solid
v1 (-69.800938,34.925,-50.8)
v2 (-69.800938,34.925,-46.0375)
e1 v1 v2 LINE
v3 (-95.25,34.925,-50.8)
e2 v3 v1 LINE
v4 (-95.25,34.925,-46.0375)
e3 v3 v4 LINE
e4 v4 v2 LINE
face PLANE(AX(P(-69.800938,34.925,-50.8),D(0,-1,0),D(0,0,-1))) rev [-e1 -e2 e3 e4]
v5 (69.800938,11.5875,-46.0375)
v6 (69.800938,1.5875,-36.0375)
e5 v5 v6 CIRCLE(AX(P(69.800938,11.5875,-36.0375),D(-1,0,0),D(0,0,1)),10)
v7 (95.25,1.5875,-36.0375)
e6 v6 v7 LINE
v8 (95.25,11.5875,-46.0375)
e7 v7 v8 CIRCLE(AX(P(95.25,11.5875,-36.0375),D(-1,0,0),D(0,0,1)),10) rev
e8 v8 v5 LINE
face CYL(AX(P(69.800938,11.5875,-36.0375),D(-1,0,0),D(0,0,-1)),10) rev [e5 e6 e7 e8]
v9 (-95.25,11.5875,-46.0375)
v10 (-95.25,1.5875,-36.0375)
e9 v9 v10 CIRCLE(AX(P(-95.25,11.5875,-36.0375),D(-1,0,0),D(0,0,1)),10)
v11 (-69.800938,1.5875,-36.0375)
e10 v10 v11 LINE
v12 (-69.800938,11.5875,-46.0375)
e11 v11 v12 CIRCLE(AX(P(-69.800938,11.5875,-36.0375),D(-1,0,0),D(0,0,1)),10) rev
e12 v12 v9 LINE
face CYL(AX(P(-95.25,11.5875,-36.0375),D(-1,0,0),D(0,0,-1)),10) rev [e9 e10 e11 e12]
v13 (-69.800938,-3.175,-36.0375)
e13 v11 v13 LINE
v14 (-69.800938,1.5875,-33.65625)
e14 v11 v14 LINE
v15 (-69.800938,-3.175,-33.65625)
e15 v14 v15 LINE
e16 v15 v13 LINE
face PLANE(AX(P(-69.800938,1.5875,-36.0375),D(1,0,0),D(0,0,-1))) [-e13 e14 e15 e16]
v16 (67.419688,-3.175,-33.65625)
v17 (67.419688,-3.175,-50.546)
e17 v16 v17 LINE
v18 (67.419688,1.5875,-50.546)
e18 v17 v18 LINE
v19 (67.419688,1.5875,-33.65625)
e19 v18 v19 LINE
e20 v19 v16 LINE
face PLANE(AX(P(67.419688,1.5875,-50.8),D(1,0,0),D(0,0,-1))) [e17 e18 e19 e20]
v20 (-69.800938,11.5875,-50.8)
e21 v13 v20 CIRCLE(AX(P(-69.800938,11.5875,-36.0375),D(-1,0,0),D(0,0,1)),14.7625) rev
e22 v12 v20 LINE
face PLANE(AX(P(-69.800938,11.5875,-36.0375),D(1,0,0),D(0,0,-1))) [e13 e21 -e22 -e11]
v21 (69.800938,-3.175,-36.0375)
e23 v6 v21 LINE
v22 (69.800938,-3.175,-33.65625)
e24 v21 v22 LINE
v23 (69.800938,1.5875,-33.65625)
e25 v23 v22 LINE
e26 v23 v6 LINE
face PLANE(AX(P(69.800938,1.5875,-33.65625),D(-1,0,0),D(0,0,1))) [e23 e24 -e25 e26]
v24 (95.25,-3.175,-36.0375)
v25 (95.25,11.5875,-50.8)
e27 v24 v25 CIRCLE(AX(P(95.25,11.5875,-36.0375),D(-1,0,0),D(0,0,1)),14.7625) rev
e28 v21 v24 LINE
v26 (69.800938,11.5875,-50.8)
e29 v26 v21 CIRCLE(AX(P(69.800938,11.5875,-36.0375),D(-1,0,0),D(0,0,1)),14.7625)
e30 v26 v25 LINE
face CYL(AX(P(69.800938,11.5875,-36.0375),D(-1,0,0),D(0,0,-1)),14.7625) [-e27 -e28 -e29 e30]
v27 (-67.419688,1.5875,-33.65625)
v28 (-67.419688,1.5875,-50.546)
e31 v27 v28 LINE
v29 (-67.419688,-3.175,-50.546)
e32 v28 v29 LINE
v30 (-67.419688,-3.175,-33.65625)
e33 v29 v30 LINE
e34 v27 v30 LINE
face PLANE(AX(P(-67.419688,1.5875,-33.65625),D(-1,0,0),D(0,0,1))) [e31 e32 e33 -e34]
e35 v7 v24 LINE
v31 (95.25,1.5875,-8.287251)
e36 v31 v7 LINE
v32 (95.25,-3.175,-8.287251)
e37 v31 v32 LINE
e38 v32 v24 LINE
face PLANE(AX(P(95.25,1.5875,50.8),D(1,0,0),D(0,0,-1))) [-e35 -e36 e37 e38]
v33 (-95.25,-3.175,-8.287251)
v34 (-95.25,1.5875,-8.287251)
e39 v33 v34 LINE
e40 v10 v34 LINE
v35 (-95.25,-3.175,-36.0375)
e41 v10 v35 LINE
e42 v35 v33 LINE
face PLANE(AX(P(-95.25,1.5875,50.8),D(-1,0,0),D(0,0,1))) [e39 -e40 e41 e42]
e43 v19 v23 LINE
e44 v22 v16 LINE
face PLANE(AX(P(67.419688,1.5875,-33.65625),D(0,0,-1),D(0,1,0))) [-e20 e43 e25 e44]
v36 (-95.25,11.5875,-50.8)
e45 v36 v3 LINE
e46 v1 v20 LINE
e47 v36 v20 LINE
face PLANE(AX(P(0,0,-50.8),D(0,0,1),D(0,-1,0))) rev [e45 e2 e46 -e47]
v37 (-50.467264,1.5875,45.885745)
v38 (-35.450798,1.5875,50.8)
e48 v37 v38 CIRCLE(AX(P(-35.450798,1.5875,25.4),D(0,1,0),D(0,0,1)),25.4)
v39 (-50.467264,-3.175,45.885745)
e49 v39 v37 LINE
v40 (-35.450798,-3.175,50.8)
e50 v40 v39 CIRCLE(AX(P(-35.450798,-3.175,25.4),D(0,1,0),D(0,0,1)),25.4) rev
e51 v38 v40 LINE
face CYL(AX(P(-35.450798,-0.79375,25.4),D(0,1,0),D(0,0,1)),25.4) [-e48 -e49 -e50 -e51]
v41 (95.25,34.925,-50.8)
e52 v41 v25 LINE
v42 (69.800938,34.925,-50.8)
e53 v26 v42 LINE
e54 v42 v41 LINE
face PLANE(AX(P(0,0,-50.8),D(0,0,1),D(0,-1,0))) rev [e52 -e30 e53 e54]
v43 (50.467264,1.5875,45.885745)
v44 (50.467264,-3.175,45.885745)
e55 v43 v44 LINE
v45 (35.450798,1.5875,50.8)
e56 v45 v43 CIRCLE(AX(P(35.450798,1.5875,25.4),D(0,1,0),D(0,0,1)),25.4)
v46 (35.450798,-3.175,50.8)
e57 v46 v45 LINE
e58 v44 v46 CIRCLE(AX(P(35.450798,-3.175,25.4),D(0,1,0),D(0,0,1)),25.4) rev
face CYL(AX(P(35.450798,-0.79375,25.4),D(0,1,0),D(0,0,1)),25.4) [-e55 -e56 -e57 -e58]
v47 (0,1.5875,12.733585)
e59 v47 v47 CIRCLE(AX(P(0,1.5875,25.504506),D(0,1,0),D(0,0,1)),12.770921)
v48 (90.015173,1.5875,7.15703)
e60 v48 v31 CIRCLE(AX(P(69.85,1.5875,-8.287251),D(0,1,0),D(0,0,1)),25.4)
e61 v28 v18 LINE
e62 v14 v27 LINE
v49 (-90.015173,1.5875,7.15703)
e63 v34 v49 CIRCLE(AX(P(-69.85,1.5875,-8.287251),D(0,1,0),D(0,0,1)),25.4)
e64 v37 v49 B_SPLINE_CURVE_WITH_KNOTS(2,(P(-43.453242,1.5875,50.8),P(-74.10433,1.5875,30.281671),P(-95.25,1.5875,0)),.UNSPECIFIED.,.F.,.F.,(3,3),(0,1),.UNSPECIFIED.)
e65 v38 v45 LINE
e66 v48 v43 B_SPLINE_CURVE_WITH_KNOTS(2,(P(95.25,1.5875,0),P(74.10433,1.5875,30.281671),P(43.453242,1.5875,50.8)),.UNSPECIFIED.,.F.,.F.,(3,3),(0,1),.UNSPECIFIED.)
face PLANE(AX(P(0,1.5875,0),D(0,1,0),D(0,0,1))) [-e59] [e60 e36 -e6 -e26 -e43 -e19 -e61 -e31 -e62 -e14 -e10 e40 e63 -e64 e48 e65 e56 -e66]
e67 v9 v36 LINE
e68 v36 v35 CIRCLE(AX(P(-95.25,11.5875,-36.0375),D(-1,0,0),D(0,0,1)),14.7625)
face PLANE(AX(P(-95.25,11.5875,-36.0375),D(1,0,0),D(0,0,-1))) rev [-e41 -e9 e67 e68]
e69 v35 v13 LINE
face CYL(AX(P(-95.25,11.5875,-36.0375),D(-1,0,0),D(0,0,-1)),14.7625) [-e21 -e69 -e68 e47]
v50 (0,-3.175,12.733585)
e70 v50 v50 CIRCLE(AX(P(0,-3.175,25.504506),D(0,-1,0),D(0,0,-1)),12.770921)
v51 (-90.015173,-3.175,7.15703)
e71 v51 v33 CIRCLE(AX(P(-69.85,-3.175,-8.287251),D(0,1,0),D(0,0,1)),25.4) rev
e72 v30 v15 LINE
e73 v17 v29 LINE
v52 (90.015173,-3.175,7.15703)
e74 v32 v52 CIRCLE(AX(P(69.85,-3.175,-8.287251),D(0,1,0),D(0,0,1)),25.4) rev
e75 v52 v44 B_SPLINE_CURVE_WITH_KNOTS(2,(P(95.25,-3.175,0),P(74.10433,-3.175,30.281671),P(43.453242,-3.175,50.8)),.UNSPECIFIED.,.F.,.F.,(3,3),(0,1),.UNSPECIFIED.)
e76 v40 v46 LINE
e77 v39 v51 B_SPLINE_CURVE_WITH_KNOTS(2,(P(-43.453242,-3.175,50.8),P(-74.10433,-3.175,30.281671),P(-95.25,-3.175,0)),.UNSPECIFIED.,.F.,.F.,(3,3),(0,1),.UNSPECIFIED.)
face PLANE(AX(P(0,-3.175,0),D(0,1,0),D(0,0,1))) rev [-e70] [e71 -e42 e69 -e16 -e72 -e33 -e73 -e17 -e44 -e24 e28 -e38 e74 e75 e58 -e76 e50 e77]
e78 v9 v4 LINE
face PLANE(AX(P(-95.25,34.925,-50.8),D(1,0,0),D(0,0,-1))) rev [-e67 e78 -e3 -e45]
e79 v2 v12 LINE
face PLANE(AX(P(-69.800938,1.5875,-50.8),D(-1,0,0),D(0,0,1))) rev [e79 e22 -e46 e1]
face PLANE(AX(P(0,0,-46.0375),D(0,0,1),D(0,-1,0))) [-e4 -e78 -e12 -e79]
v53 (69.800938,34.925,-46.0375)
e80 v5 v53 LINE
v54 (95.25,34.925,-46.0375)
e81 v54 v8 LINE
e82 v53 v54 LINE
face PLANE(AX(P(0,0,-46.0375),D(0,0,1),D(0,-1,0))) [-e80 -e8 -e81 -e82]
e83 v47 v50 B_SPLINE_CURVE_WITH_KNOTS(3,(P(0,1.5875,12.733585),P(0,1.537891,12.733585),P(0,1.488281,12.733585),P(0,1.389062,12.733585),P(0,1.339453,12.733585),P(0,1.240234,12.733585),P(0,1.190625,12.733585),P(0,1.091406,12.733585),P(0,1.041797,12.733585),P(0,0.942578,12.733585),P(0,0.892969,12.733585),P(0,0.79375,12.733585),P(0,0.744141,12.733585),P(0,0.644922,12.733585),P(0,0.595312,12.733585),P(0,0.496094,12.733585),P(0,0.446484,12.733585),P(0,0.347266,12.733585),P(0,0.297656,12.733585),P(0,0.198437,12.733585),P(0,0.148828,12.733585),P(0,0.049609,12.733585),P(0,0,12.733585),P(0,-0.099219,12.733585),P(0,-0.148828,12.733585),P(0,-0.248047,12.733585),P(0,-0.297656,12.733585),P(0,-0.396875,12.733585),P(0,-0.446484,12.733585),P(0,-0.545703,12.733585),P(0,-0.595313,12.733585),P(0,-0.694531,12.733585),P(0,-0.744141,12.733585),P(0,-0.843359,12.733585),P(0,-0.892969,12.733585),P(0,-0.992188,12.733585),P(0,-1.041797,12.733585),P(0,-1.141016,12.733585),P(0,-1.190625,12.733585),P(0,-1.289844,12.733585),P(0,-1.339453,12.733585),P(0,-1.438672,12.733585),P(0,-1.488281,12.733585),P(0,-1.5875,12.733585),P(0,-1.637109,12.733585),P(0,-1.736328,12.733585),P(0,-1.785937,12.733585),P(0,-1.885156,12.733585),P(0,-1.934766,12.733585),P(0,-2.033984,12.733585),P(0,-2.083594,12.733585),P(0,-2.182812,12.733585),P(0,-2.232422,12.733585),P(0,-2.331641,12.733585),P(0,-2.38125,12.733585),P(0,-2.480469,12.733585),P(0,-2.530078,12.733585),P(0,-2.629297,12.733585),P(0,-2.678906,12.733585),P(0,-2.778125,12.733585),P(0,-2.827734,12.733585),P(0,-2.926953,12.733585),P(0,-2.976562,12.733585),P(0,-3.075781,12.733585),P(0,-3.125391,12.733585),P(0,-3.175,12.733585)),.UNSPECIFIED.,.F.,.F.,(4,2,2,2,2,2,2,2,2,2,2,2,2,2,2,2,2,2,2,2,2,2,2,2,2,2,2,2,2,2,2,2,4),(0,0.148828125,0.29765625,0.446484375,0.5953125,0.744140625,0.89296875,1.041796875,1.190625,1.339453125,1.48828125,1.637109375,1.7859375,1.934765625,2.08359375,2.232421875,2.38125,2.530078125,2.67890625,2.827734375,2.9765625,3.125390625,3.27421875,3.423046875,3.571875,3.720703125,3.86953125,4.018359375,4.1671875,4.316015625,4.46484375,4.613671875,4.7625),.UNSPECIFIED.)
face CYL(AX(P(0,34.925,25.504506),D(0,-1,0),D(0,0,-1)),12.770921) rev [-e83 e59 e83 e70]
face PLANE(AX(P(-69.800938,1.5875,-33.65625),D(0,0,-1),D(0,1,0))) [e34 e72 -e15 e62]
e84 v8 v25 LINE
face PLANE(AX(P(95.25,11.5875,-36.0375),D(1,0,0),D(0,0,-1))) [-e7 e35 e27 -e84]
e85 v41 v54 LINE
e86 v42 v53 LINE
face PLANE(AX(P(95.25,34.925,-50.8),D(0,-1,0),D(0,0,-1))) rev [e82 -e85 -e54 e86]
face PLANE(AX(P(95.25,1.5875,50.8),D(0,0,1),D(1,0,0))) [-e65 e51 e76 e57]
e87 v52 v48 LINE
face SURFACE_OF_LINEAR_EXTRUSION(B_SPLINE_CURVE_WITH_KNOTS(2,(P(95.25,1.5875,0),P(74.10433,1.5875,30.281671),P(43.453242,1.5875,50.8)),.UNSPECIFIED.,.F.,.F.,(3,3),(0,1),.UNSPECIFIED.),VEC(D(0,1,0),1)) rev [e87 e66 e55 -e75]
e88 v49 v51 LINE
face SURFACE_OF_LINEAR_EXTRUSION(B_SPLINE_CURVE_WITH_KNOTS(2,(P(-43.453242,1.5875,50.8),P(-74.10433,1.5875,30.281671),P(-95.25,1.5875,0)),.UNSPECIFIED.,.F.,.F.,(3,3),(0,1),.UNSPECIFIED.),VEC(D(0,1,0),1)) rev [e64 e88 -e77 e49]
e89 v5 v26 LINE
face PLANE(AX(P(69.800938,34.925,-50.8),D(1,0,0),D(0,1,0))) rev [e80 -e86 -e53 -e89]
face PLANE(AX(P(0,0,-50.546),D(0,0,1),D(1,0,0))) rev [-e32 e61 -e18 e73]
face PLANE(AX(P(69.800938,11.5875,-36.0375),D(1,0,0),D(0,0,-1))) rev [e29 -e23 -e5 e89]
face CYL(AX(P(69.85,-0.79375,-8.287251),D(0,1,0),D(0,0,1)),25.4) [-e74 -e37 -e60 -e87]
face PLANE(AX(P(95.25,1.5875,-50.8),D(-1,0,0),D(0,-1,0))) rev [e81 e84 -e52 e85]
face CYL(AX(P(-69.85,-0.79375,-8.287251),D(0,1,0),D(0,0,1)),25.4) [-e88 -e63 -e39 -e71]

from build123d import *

# Parameters (mm, degrees)
SKETCH1_W                     = 190.5
SKETCH1_H                     = 101.6
BOSS_EXTRUDE1_DEPTH           = 1.5875
CONVERT_SOLID1_START          = -95.25
CONVERT_SOLID1_OUTLINE_W      = 3.175
CONVERT_SOLID1_OUTLINE_H      = 101.6
CONVERT_SOLID1_DEPTH          = 190.5
CUT_EXTRUDE5_START            = -4.7625
CUT_EXTRUDE5_DEPTH            = 4.7625
FILLET3_R                     = 25.4
FILLET4_R                     = 25.4
FILLET5_R                     = 25.4
FILLET6_R                     = 25.4
SKETCH30_R                    = 12.770921212
CUT_EXTRUDE6_DEPTH            = 38.1
SKETCH35_W                    = 139.601875342
SKETCH35_H                    = 6.35
CUT_EXTRUDE7_DEPTH            = 0.254
EDGE_FLANGE1_STRIP_W          = 39.05
EDGE_FLANGE1_STRIP_H          = 4.7625
EDGE_FLANGE1_STRIP_CUT_DEPTH  = 25.449062329
EDGE_FLANGE1_RELIEF_W         = 41.43125
EDGE_FLANGE1_RELIEF_H         = 2.38125
EDGE_FLANGE1_RELIEF_CUT_DEPTH = 4.7625
EDGE_FLANGE1_DEPTH            = 25.449062329
EDGE_FLANGE2_STRIP_W          = 39.05
EDGE_FLANGE2_STRIP_H          = 4.7625
EDGE_FLANGE2_STRIP_CUT_DEPTH  = 25.449062329
EDGE_FLANGE2_RELIEF_W         = 41.43125
EDGE_FLANGE2_RELIEF_H         = 2.38125
EDGE_FLANGE2_RELIEF_CUT_DEPTH = 4.7625
EDGE_FLANGE2_DEPTH            = 25.449062329


# Read off the part's stored shape, not the designer's step: Convert-Solid1, Cut-Extrude5
# Sheet-metal steps are written as plain solids
with BuildPart() as part:
    # Sketch1 → Boss-Extrude1 (new body)
    with BuildSketch(Plane(origin=(0, 0, 0), x_dir=(1, 0, 0), z_dir=(0, 1, 0))):
        Rectangle(SKETCH1_W, SKETCH1_H)
    extrude(amount=BOSS_EXTRUDE1_DEPTH)

    # Convert-Solid1 outline → Convert-Solid1 (add)
    with BuildSketch(Plane.YZ.offset(CONVERT_SOLID1_START)):
        with Locations((-1.5875, 0)):
            Rectangle(CONVERT_SOLID1_OUTLINE_W, CONVERT_SOLID1_OUTLINE_H)
    extrude(amount=CONVERT_SOLID1_DEPTH)

    # Cut-Extrude5 outline → Cut-Extrude5 (cut)
    with BuildSketch(Plane(origin=(0, 1.5875, 0), x_dir=(1, 0, 0), z_dir=(0, 1, 0)).offset(CUT_EXTRUDE5_START)):
        with BuildLine():
            Line((95.25, -50.8), (95.25, 0))
            add(Edge.make_bspline(
                [(95.25, 0), (74.104329576, -30.281671419), (43.45324244, -50.8)],
                knots=[0, 0, 0, 1, 1, 1], degree=2))
            Line((43.45324244, -50.8), (95.25, -50.8))
        make_face()
        with BuildLine():
            Line((-95.25, -50.8), (-43.45324244, -50.8))
            add(Edge.make_bspline(
                [(-43.45324244, -50.8), (-74.104329576, -30.281671419), (-95.25, 0)],
                knots=[0, 0, 0, 1, 1, 1], degree=2))
            Line((-95.25, 0), (-95.25, -50.8))
        make_face()
    extrude(amount=CUT_EXTRUDE5_DEPTH, mode=Mode.SUBTRACT)

    # Fillet3
    fillet3_edges = [part.edges().sort_by_distance(p)[0] for p in [
        (-95.25, -0.79375, 0),
    ]]
    fillet(fillet3_edges, radius=FILLET3_R)

    # Fillet4
    fillet4_edges = [part.edges().sort_by_distance(p)[0] for p in [
        (-43.45324244, -0.79375, 50.8),
    ]]
    fillet(fillet4_edges, radius=FILLET4_R)

    # Fillet5
    fillet5_edges = [part.edges().sort_by_distance(p)[0] for p in [
        (43.45324244, -0.79375, 50.8),
    ]]
    fillet(fillet5_edges, radius=FILLET5_R)

    # Fillet6
    fillet6_edges = [part.edges().sort_by_distance(p)[0] for p in [
        (95.25, -0.79375, 0),
    ]]
    fillet(fillet6_edges, radius=FILLET6_R)

    # Sketch30 → Cut-Extrude6 (cut)
    with BuildSketch(Plane(origin=(0, -3.175, 0), x_dir=(-1, 0, 0), z_dir=(0, -1, 0))):
        with Locations(Location((0, -25.504506424, 0), (0, 0, 90))):
            Circle(SKETCH30_R)
    extrude(amount=-CUT_EXTRUDE6_DEPTH, mode=Mode.SUBTRACT)

    # Sketch35 → Cut-Extrude7 (cut)
    with BuildSketch(Plane(origin=(0, 0, -50.8), x_dir=(-1, 0, 0), z_dir=(0, 0, -1))):
        Rectangle(SKETCH35_W, SKETCH35_H)
    extrude(amount=-CUT_EXTRUDE7_DEPTH, mode=Mode.SUBTRACT)

    # Edge-Flange1 strip (across the edge) → Edge-Flange1 strip cut (cut)
    with BuildSketch(Plane(origin=(95.25, 1.5875, -50.8), x_dir=(0, 0, 1), z_dir=(-1, 0, 0))):
        with Locations((-4.7625, -2.38125)):
            Rectangle(EDGE_FLANGE1_STRIP_W, EDGE_FLANGE1_STRIP_H)
    extrude(amount=EDGE_FLANGE1_STRIP_CUT_DEPTH, mode=Mode.SUBTRACT)

    # Edge-Flange1 relief (on the sheet) → Edge-Flange1 relief cut (cut)
    with BuildSketch(Plane(origin=(95.25, 1.5875, -36.0375), x_dir=(0, 0, 1), z_dir=(0, 1, 0))):
        with Locations((-18.334375, -26.639687329)):
            Rectangle(EDGE_FLANGE1_RELIEF_W, EDGE_FLANGE1_RELIEF_H)
    extrude(amount=-EDGE_FLANGE1_RELIEF_CUT_DEPTH, mode=Mode.SUBTRACT)

    # Edge-Flange1 section (across the edge) → Edge-Flange1 (add)
    with BuildSketch(Plane(origin=(95.25, 1.5875, -50.8), x_dir=(0, 0, 1), z_dir=(-1, 0, 0))):
        with BuildLine():
            Line((0, 10), (0, 33.3375))
            Line((0, 33.3375), (4.7625, 33.3375))
            Line((4.7625, 33.3375), (4.7625, 10))
            ThreePointArc((4.7625, 10), (7.691432188, 2.928932188), (14.7625, 0))
            Line((14.7625, 0), (14.7625, -4.7625))
            ThreePointArc((14.7625, -4.7625), (4.323836143, -0.438663857), (0, 10))
        make_face()
    extrude(amount=EDGE_FLANGE1_DEPTH)

    # Edge-Flange2 strip (across the edge) → Edge-Flange2 strip cut (cut)
    with BuildSketch(Plane(origin=(-69.800937671, 1.5875, -50.8), x_dir=(0, 0, 1), z_dir=(-1, 0, 0))):
        with Locations((-4.7625, -2.38125)):
            Rectangle(EDGE_FLANGE2_STRIP_W, EDGE_FLANGE2_STRIP_H)
    extrude(amount=EDGE_FLANGE2_STRIP_CUT_DEPTH, mode=Mode.SUBTRACT)

    # Edge-Flange2 relief (on the sheet) → Edge-Flange2 relief cut (cut)
    with BuildSketch(Plane(origin=(-69.800937671, 1.5875, -36.0375), x_dir=(0, 0, 1), z_dir=(0, 1, 0))):
        with Locations((-18.334375, 1.190625)):
            Rectangle(EDGE_FLANGE2_RELIEF_W, EDGE_FLANGE2_RELIEF_H)
    extrude(amount=-EDGE_FLANGE2_RELIEF_CUT_DEPTH, mode=Mode.SUBTRACT)

    # Edge-Flange2 section (across the edge) → Edge-Flange2 (add)
    with BuildSketch(Plane(origin=(-69.800937671, 1.5875, -50.8), x_dir=(0, 0, 1), z_dir=(-1, 0, 0))):
        with BuildLine():
            Line((0, 10), (0, 33.3375))
            Line((0, 33.3375), (4.7625, 33.3375))
            Line((4.7625, 33.3375), (4.7625, 10))
            ThreePointArc((4.7625, 10), (7.691432188, 2.928932188), (14.7625, 0))
            Line((14.7625, 0), (14.7625, -4.7625))
            ThreePointArc((14.7625, -4.7625), (4.323836143, -0.438663857), (0, 10))
        make_face()
    extrude(amount=EDGE_FLANGE2_DEPTH)


solid = part.part
